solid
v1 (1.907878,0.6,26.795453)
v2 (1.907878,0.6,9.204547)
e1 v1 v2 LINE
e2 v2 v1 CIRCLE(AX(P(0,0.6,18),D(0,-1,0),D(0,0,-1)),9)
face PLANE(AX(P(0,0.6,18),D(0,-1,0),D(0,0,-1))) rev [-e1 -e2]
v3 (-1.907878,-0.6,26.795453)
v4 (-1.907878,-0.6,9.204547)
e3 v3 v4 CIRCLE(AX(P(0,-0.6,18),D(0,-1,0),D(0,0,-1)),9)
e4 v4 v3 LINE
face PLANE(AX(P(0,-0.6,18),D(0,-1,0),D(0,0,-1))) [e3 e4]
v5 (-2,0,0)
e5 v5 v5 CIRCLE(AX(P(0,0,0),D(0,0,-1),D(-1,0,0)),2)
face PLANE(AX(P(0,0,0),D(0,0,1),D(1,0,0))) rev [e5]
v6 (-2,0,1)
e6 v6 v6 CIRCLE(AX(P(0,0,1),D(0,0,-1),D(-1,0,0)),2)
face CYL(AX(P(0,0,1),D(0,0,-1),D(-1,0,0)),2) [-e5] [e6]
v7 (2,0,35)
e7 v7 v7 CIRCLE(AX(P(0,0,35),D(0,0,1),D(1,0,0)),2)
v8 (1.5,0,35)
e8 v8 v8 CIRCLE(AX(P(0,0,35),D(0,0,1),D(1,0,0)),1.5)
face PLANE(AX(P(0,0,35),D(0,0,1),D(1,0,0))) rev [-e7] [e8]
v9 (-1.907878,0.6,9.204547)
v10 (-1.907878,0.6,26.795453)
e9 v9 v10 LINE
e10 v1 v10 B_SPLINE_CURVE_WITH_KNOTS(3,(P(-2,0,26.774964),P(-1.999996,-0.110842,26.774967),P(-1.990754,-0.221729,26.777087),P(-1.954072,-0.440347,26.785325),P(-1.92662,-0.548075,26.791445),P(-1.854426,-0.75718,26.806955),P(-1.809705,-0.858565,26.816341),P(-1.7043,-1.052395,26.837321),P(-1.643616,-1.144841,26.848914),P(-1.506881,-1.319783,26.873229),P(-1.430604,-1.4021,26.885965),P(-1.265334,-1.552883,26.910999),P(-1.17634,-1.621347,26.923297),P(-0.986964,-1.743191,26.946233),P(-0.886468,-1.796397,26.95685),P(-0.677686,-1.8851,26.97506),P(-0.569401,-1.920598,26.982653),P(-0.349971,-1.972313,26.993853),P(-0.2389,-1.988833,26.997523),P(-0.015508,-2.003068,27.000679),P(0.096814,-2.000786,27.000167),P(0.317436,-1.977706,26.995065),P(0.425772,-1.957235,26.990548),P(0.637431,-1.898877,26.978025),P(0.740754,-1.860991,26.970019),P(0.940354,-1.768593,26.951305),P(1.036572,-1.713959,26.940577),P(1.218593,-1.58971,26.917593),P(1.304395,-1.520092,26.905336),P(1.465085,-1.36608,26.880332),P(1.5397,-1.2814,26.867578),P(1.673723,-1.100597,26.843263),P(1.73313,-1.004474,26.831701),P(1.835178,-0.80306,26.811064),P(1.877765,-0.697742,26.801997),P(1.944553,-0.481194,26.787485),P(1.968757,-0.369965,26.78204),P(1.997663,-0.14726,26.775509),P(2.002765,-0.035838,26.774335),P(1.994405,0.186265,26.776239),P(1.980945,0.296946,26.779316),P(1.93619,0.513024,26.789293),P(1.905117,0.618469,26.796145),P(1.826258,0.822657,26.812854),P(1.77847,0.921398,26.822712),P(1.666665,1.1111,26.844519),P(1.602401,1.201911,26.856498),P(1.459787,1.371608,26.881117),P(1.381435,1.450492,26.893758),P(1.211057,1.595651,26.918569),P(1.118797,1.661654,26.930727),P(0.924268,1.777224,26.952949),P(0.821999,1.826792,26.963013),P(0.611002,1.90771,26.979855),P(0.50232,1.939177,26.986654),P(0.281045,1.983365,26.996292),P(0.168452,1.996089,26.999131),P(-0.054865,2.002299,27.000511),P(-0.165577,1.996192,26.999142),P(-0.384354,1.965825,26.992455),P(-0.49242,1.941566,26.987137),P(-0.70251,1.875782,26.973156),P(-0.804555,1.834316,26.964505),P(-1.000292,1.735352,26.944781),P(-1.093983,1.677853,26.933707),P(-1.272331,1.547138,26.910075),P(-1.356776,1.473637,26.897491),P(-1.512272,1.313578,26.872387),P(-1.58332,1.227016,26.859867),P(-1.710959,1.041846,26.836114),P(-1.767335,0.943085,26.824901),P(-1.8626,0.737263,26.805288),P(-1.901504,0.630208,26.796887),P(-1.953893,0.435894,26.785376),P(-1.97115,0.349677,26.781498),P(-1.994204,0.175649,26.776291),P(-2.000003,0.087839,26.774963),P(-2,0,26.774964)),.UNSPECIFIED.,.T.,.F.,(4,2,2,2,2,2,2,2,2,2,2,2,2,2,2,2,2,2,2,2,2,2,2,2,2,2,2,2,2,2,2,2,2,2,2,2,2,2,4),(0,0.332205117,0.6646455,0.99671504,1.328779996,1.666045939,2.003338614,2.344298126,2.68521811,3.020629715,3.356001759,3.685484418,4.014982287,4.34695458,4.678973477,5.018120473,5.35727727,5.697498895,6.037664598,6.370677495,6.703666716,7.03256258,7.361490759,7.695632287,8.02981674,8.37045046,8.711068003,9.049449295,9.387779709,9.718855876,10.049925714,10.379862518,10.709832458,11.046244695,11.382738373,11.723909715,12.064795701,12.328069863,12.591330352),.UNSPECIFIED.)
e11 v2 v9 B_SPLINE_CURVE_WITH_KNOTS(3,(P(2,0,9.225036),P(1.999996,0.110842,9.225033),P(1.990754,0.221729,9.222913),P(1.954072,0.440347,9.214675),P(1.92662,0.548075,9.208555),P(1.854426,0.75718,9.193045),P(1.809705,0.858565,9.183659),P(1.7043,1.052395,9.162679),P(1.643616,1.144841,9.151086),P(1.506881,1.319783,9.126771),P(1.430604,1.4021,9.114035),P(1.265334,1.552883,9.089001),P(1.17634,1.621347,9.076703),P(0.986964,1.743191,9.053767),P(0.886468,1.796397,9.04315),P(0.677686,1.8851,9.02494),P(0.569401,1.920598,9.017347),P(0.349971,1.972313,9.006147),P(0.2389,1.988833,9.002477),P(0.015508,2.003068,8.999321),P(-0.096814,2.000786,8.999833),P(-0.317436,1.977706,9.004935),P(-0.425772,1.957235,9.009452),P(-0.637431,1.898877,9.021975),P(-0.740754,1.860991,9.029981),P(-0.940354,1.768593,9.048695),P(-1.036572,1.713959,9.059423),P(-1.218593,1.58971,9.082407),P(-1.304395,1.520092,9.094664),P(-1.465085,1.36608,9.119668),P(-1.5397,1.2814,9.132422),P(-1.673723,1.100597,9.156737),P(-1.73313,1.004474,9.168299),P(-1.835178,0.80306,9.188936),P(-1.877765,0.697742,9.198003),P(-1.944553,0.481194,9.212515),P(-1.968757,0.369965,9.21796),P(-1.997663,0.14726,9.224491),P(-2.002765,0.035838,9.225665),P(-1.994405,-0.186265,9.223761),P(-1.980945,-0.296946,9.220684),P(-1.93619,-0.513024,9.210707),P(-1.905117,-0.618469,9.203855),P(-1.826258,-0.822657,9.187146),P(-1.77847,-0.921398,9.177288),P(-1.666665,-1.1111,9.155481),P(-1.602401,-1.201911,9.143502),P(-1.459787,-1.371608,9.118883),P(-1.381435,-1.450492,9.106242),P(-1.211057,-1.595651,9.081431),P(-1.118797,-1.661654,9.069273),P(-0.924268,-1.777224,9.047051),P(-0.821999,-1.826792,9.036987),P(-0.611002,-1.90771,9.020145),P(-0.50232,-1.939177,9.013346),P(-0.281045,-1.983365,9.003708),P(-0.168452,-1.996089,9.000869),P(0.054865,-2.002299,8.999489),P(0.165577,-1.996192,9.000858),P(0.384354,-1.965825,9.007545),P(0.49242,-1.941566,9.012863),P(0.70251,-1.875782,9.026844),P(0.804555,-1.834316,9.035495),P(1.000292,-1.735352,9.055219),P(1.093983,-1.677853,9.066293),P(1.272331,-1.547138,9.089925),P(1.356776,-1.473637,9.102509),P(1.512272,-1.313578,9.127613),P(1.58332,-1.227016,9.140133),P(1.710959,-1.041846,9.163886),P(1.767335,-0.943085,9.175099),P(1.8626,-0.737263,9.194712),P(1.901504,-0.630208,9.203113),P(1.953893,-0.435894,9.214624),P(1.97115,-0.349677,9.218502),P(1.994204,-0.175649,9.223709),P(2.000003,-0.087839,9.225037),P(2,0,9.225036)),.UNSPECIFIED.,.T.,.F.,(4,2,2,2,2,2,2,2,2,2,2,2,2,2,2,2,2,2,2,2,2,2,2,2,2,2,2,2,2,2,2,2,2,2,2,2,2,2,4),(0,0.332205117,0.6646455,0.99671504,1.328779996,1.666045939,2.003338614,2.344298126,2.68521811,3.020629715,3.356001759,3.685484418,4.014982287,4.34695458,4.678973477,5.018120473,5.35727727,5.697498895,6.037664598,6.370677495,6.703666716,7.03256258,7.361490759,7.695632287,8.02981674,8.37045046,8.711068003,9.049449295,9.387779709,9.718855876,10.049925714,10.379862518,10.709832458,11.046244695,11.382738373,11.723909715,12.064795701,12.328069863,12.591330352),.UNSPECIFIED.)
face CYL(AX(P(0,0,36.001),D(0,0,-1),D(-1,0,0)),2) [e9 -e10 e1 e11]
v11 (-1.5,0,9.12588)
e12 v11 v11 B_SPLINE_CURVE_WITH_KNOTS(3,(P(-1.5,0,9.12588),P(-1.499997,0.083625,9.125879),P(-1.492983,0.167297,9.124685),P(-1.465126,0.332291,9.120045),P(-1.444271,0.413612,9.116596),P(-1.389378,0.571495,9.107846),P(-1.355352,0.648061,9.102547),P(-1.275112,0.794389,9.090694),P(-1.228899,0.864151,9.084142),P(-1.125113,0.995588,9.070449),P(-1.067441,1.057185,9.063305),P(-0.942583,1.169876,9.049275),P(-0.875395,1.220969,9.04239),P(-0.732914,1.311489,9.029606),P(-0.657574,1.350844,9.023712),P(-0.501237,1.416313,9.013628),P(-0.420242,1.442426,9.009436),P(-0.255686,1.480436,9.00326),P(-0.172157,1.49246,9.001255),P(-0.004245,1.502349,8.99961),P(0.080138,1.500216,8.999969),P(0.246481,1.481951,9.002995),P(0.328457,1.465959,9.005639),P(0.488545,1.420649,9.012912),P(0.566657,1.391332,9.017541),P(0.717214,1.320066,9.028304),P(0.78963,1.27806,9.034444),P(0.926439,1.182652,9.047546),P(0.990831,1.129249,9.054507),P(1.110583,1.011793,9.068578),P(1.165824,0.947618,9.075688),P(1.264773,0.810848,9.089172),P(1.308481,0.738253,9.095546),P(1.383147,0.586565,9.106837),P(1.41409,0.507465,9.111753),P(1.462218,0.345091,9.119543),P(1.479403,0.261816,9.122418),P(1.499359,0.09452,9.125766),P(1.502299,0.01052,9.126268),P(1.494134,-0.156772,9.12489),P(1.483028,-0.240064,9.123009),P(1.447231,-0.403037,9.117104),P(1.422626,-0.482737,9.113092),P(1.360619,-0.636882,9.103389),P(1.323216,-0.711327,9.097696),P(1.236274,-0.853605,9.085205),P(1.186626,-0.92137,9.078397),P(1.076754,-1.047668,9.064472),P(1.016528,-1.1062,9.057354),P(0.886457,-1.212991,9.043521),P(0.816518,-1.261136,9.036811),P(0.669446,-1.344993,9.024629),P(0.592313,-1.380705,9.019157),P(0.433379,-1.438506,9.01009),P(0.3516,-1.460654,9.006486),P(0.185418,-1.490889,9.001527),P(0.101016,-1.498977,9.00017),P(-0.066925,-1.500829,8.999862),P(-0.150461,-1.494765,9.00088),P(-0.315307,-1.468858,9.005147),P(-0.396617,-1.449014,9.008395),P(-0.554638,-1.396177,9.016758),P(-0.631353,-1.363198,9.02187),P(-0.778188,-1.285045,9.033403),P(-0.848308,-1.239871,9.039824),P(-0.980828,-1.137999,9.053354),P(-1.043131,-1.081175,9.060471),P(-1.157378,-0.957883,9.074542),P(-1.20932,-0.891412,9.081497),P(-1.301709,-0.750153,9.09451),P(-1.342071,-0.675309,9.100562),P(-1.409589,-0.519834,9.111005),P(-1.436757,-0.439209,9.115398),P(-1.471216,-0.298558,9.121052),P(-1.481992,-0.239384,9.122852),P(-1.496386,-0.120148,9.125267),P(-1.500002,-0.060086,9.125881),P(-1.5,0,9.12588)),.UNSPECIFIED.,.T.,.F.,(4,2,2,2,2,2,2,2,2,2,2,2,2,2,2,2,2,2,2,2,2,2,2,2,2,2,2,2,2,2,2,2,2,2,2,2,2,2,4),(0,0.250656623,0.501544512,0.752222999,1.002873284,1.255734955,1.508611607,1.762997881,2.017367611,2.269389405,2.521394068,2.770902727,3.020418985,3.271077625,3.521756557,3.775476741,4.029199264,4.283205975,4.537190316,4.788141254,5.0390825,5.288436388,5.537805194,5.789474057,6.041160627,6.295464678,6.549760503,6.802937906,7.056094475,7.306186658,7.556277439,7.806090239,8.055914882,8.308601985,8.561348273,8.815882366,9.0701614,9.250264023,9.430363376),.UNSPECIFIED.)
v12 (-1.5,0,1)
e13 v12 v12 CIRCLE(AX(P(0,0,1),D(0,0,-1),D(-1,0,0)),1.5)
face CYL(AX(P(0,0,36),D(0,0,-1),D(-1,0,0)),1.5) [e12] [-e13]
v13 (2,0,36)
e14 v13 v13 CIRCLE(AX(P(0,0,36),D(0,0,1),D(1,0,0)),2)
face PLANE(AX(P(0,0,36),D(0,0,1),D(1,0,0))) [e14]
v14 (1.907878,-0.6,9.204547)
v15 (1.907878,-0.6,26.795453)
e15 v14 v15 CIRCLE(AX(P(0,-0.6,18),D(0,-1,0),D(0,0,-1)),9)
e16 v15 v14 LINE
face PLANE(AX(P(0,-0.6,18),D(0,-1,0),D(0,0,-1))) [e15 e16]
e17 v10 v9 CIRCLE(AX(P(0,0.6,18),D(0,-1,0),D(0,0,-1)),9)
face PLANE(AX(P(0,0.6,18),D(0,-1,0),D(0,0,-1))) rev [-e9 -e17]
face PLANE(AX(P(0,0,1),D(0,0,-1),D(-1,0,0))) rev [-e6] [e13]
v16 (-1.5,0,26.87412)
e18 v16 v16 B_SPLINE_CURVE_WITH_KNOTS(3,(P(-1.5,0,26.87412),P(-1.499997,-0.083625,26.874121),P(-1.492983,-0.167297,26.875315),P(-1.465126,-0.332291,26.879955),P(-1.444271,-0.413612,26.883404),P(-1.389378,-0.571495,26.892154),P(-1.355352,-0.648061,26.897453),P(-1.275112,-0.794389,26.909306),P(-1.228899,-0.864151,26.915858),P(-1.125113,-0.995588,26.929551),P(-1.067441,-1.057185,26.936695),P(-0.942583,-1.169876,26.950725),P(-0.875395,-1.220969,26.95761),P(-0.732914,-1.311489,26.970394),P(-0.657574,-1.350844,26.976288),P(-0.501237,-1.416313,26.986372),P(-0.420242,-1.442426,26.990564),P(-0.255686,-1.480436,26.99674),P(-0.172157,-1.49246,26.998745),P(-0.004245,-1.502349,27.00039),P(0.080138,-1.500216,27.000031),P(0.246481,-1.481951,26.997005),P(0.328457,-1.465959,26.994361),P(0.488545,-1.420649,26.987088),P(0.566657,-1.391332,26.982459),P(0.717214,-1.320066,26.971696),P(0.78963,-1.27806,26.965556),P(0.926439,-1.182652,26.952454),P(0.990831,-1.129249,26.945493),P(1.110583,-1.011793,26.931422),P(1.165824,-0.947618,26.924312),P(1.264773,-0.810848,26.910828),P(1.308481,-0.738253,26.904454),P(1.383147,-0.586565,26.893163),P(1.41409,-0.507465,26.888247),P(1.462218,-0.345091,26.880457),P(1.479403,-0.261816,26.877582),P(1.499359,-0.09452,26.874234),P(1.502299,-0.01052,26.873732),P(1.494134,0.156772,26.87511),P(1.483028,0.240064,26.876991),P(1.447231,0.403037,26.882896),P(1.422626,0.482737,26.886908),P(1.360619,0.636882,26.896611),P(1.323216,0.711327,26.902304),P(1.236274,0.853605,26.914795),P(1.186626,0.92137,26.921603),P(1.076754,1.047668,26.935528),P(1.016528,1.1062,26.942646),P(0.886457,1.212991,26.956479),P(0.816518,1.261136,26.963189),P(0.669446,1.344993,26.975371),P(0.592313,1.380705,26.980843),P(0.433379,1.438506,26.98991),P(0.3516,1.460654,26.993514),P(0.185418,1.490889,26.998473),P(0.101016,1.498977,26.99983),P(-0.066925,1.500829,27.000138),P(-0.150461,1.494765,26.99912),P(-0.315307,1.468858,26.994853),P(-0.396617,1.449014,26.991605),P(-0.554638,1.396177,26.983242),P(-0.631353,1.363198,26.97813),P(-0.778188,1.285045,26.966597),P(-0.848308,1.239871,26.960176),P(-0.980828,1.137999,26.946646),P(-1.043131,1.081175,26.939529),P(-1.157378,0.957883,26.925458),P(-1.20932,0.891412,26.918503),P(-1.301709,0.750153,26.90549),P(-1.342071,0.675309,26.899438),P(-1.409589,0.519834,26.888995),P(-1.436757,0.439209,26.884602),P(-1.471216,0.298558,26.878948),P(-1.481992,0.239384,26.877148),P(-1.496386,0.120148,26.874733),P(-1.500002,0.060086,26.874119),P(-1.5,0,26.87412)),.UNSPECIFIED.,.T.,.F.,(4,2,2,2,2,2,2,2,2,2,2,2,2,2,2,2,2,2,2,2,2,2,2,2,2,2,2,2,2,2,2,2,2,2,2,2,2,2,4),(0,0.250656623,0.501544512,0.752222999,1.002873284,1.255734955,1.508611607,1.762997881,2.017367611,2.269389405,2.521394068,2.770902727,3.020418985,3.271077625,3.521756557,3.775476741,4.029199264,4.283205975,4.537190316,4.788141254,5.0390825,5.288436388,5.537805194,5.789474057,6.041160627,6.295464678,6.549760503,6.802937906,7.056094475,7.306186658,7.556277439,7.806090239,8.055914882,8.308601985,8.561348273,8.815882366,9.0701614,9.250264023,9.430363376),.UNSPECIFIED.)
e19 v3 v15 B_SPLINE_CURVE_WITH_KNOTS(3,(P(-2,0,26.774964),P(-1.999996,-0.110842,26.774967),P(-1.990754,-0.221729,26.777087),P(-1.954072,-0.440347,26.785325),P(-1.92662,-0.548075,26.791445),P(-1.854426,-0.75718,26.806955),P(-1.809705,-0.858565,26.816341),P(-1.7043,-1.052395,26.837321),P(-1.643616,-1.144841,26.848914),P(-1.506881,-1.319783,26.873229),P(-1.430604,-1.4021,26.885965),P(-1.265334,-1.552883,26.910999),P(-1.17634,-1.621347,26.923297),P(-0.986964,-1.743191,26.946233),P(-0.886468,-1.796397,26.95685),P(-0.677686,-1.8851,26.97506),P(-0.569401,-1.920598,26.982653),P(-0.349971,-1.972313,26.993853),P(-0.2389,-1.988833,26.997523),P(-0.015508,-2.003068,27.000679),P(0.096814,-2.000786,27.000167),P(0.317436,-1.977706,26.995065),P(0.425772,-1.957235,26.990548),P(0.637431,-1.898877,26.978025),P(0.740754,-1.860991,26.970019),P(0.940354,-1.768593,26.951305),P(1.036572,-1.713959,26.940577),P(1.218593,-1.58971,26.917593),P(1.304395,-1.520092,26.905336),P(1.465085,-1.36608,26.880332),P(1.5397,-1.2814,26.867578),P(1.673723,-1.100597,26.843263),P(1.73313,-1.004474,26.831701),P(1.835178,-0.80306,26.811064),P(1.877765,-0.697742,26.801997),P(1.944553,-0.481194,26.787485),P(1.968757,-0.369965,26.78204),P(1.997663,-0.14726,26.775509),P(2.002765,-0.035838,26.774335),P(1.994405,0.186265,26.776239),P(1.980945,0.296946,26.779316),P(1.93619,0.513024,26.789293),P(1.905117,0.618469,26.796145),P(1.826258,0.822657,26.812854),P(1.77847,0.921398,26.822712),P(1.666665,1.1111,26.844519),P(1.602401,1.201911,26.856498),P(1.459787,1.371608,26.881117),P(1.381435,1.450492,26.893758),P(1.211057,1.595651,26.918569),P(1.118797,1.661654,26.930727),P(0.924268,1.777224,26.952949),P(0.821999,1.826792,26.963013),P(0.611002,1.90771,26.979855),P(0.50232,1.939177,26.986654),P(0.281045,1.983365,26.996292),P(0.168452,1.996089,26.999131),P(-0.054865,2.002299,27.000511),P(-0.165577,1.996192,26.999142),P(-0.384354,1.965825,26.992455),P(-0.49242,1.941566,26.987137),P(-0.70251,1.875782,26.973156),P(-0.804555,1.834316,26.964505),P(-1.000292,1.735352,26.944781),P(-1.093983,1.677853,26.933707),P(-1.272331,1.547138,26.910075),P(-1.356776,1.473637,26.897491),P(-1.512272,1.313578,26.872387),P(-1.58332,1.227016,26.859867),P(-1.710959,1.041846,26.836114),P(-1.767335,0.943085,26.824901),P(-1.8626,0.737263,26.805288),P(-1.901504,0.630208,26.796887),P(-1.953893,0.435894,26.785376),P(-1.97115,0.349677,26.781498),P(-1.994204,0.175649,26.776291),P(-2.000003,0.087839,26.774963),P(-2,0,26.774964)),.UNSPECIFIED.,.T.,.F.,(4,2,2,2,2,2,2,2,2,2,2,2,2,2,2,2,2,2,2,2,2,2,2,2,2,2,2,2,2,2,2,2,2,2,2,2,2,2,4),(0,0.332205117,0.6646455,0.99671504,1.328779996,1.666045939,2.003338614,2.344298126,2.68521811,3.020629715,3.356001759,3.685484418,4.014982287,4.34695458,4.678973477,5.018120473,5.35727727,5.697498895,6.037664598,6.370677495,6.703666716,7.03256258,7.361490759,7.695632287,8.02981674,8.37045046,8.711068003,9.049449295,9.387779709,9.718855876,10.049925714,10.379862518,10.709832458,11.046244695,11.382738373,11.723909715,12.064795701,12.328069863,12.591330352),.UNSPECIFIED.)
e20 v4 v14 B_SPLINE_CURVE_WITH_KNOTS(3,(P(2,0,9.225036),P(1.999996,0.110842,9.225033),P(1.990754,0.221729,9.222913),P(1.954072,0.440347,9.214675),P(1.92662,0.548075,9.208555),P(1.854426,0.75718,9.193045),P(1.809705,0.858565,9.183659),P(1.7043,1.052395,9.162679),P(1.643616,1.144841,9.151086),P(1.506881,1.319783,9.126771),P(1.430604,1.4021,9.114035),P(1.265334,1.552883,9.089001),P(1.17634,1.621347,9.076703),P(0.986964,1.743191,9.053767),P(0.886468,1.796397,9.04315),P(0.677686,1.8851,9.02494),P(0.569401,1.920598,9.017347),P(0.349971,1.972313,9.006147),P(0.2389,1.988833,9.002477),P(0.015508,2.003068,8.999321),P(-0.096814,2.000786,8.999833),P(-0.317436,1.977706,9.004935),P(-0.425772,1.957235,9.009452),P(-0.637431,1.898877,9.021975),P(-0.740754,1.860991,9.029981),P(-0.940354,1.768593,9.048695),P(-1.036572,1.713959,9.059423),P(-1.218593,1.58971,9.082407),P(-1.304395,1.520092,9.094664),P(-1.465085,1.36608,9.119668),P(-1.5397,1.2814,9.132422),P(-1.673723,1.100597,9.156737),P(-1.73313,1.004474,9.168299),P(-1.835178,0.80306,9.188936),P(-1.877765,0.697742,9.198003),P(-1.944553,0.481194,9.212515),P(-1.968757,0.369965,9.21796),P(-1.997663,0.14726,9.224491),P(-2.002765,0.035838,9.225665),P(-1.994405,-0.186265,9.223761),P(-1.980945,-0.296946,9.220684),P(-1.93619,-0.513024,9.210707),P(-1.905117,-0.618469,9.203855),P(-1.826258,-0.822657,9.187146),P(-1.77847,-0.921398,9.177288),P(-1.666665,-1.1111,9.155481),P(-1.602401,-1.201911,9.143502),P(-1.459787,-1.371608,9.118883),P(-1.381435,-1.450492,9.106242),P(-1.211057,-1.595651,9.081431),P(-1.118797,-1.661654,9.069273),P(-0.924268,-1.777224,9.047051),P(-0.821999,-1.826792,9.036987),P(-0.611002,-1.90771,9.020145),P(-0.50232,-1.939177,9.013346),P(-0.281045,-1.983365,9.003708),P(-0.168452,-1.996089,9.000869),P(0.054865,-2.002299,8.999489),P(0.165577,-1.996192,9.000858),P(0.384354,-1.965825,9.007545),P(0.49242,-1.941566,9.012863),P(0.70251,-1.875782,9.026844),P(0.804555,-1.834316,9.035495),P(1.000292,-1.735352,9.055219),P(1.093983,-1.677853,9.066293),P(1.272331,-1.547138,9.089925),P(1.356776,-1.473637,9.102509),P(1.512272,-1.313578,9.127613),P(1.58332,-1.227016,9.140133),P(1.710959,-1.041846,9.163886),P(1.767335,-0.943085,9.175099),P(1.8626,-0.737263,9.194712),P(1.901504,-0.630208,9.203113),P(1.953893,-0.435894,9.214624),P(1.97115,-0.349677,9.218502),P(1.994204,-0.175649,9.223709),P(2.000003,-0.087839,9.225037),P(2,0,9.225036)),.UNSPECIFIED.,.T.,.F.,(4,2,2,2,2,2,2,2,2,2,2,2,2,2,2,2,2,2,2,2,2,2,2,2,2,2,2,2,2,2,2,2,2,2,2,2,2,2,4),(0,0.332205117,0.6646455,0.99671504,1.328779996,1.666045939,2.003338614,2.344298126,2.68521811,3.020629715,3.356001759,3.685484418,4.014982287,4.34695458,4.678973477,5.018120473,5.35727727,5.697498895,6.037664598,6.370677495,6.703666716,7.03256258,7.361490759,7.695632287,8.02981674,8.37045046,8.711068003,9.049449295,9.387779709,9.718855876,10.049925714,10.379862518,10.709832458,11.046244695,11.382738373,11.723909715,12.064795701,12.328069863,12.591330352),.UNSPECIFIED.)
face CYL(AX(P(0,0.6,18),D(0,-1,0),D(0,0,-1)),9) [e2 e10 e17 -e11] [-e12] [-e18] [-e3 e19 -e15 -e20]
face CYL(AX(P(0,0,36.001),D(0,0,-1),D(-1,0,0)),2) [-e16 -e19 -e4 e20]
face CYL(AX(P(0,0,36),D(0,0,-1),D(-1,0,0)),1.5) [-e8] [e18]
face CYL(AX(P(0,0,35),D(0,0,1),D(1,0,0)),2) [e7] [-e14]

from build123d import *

# Parameters (mm, degrees)
SKETCH1_R                            = 1.5
BOSS_EXTRUDE1_DEPTH                  = 36
SKETCH2_R                            = 2
BOSS_EXTRUDE2_DEPTH                  = 1
BOSS_EXTRUDE4_START                  = -1
SKETCH3_R                            = 2
BOSS_EXTRUDE4_DEPTH                  = 1
BOSS_EXTRUDE6_DEPTH                  = 0.6
BOSS_EXTRUDE6_DEPTH_BACK             = 0.6
SKETCH8_R                            = 9
BOSS_EXTRUDE5_REACH                  = 22.224
BOSS_EXTRUDE5_END_RADIUS             = 9
SKETCH4_R                            = 2
BOSS_EXTRUDE5_DIRECTION_2_REACH      = 22.224
BOSS_EXTRUDE5_DIRECTION_2_END_RADIUS = 9


with BuildPart() as part:
    # Sketch1 → Boss-Extrude1 (new body)
    with BuildSketch(Plane.XY):
        Circle(SKETCH1_R)
    extrude(amount=BOSS_EXTRUDE1_DEPTH)

    # Sketch2 → Boss-Extrude2 (add)
    with BuildSketch(Plane(origin=(0, 0, 0), x_dir=(-1, 0, 0), z_dir=(0, 0, -1))):
        Circle(SKETCH2_R)
    extrude(amount=-BOSS_EXTRUDE2_DEPTH)

    # Sketch3 → Boss-Extrude4 (add)
    with BuildSketch(Plane.XY.offset(36).offset(BOSS_EXTRUDE4_START)):
        Circle(SKETCH3_R)
    extrude(amount=BOSS_EXTRUDE4_DEPTH)

    # Sketch8 → Boss-Extrude6 (add, two sides: drawn at the far end of the back side and taken through both)
    with BuildSketch(Plane(origin=(0, 0, 0), x_dir=(-1, 0, 0), z_dir=(0, -1, 0)).offset(-BOSS_EXTRUDE6_DEPTH_BACK)):
        with Locations((0, -18)):
            Circle(SKETCH8_R)
    extrude(amount=BOSS_EXTRUDE6_DEPTH + BOSS_EXTRUDE6_DEPTH_BACK)

    # Boss-Extrude5: up to this cylinder (the profile starts inside it)
    boss_extrude5_end = Plane(origin=(0, 0, 18), z_dir=(0, -1, 0)) * Cylinder(BOSS_EXTRUDE5_END_RADIUS, 63.448, mode=Mode.PRIVATE)
    # Sketch4 → Boss-Extrude5 (add, up to the surface)
    with BuildSketch(Plane.XY.offset(18), mode=Mode.PRIVATE) as boss_extrude5_sk1:
        Circle(SKETCH4_R)
    boss_extrude5_tool1 = extrude(boss_extrude5_sk1.sketch, amount=BOSS_EXTRUDE5_REACH, mode=Mode.PRIVATE) & boss_extrude5_end
    add(boss_extrude5_tool1.solids().sort_by_distance((0, 0, 18))[0])

    # Boss-Extrude5 direction 2: up to this cylinder (the profile starts inside it)
    boss_extrude5_direction_2_end = Plane(origin=(0, 0, 18), z_dir=(0, -1, 0)) * Cylinder(BOSS_EXTRUDE5_DIRECTION_2_END_RADIUS, 63.448, mode=Mode.PRIVATE)
    # Sketch4 → Boss-Extrude5 direction 2 (add, up to the surface)
    with BuildSketch(Plane.XY.offset(18), mode=Mode.PRIVATE) as boss_extrude5_direction_2_sk1:
        Circle(SKETCH4_R)
    boss_extrude5_direction_2_tool1 = extrude(boss_extrude5_direction_2_sk1.sketch, amount=-BOSS_EXTRUDE5_DIRECTION_2_REACH, mode=Mode.PRIVATE) & boss_extrude5_direction_2_end
    add(boss_extrude5_direction_2_tool1.solids().sort_by_distance((0, 0, 18))[0])


solid = part.part
